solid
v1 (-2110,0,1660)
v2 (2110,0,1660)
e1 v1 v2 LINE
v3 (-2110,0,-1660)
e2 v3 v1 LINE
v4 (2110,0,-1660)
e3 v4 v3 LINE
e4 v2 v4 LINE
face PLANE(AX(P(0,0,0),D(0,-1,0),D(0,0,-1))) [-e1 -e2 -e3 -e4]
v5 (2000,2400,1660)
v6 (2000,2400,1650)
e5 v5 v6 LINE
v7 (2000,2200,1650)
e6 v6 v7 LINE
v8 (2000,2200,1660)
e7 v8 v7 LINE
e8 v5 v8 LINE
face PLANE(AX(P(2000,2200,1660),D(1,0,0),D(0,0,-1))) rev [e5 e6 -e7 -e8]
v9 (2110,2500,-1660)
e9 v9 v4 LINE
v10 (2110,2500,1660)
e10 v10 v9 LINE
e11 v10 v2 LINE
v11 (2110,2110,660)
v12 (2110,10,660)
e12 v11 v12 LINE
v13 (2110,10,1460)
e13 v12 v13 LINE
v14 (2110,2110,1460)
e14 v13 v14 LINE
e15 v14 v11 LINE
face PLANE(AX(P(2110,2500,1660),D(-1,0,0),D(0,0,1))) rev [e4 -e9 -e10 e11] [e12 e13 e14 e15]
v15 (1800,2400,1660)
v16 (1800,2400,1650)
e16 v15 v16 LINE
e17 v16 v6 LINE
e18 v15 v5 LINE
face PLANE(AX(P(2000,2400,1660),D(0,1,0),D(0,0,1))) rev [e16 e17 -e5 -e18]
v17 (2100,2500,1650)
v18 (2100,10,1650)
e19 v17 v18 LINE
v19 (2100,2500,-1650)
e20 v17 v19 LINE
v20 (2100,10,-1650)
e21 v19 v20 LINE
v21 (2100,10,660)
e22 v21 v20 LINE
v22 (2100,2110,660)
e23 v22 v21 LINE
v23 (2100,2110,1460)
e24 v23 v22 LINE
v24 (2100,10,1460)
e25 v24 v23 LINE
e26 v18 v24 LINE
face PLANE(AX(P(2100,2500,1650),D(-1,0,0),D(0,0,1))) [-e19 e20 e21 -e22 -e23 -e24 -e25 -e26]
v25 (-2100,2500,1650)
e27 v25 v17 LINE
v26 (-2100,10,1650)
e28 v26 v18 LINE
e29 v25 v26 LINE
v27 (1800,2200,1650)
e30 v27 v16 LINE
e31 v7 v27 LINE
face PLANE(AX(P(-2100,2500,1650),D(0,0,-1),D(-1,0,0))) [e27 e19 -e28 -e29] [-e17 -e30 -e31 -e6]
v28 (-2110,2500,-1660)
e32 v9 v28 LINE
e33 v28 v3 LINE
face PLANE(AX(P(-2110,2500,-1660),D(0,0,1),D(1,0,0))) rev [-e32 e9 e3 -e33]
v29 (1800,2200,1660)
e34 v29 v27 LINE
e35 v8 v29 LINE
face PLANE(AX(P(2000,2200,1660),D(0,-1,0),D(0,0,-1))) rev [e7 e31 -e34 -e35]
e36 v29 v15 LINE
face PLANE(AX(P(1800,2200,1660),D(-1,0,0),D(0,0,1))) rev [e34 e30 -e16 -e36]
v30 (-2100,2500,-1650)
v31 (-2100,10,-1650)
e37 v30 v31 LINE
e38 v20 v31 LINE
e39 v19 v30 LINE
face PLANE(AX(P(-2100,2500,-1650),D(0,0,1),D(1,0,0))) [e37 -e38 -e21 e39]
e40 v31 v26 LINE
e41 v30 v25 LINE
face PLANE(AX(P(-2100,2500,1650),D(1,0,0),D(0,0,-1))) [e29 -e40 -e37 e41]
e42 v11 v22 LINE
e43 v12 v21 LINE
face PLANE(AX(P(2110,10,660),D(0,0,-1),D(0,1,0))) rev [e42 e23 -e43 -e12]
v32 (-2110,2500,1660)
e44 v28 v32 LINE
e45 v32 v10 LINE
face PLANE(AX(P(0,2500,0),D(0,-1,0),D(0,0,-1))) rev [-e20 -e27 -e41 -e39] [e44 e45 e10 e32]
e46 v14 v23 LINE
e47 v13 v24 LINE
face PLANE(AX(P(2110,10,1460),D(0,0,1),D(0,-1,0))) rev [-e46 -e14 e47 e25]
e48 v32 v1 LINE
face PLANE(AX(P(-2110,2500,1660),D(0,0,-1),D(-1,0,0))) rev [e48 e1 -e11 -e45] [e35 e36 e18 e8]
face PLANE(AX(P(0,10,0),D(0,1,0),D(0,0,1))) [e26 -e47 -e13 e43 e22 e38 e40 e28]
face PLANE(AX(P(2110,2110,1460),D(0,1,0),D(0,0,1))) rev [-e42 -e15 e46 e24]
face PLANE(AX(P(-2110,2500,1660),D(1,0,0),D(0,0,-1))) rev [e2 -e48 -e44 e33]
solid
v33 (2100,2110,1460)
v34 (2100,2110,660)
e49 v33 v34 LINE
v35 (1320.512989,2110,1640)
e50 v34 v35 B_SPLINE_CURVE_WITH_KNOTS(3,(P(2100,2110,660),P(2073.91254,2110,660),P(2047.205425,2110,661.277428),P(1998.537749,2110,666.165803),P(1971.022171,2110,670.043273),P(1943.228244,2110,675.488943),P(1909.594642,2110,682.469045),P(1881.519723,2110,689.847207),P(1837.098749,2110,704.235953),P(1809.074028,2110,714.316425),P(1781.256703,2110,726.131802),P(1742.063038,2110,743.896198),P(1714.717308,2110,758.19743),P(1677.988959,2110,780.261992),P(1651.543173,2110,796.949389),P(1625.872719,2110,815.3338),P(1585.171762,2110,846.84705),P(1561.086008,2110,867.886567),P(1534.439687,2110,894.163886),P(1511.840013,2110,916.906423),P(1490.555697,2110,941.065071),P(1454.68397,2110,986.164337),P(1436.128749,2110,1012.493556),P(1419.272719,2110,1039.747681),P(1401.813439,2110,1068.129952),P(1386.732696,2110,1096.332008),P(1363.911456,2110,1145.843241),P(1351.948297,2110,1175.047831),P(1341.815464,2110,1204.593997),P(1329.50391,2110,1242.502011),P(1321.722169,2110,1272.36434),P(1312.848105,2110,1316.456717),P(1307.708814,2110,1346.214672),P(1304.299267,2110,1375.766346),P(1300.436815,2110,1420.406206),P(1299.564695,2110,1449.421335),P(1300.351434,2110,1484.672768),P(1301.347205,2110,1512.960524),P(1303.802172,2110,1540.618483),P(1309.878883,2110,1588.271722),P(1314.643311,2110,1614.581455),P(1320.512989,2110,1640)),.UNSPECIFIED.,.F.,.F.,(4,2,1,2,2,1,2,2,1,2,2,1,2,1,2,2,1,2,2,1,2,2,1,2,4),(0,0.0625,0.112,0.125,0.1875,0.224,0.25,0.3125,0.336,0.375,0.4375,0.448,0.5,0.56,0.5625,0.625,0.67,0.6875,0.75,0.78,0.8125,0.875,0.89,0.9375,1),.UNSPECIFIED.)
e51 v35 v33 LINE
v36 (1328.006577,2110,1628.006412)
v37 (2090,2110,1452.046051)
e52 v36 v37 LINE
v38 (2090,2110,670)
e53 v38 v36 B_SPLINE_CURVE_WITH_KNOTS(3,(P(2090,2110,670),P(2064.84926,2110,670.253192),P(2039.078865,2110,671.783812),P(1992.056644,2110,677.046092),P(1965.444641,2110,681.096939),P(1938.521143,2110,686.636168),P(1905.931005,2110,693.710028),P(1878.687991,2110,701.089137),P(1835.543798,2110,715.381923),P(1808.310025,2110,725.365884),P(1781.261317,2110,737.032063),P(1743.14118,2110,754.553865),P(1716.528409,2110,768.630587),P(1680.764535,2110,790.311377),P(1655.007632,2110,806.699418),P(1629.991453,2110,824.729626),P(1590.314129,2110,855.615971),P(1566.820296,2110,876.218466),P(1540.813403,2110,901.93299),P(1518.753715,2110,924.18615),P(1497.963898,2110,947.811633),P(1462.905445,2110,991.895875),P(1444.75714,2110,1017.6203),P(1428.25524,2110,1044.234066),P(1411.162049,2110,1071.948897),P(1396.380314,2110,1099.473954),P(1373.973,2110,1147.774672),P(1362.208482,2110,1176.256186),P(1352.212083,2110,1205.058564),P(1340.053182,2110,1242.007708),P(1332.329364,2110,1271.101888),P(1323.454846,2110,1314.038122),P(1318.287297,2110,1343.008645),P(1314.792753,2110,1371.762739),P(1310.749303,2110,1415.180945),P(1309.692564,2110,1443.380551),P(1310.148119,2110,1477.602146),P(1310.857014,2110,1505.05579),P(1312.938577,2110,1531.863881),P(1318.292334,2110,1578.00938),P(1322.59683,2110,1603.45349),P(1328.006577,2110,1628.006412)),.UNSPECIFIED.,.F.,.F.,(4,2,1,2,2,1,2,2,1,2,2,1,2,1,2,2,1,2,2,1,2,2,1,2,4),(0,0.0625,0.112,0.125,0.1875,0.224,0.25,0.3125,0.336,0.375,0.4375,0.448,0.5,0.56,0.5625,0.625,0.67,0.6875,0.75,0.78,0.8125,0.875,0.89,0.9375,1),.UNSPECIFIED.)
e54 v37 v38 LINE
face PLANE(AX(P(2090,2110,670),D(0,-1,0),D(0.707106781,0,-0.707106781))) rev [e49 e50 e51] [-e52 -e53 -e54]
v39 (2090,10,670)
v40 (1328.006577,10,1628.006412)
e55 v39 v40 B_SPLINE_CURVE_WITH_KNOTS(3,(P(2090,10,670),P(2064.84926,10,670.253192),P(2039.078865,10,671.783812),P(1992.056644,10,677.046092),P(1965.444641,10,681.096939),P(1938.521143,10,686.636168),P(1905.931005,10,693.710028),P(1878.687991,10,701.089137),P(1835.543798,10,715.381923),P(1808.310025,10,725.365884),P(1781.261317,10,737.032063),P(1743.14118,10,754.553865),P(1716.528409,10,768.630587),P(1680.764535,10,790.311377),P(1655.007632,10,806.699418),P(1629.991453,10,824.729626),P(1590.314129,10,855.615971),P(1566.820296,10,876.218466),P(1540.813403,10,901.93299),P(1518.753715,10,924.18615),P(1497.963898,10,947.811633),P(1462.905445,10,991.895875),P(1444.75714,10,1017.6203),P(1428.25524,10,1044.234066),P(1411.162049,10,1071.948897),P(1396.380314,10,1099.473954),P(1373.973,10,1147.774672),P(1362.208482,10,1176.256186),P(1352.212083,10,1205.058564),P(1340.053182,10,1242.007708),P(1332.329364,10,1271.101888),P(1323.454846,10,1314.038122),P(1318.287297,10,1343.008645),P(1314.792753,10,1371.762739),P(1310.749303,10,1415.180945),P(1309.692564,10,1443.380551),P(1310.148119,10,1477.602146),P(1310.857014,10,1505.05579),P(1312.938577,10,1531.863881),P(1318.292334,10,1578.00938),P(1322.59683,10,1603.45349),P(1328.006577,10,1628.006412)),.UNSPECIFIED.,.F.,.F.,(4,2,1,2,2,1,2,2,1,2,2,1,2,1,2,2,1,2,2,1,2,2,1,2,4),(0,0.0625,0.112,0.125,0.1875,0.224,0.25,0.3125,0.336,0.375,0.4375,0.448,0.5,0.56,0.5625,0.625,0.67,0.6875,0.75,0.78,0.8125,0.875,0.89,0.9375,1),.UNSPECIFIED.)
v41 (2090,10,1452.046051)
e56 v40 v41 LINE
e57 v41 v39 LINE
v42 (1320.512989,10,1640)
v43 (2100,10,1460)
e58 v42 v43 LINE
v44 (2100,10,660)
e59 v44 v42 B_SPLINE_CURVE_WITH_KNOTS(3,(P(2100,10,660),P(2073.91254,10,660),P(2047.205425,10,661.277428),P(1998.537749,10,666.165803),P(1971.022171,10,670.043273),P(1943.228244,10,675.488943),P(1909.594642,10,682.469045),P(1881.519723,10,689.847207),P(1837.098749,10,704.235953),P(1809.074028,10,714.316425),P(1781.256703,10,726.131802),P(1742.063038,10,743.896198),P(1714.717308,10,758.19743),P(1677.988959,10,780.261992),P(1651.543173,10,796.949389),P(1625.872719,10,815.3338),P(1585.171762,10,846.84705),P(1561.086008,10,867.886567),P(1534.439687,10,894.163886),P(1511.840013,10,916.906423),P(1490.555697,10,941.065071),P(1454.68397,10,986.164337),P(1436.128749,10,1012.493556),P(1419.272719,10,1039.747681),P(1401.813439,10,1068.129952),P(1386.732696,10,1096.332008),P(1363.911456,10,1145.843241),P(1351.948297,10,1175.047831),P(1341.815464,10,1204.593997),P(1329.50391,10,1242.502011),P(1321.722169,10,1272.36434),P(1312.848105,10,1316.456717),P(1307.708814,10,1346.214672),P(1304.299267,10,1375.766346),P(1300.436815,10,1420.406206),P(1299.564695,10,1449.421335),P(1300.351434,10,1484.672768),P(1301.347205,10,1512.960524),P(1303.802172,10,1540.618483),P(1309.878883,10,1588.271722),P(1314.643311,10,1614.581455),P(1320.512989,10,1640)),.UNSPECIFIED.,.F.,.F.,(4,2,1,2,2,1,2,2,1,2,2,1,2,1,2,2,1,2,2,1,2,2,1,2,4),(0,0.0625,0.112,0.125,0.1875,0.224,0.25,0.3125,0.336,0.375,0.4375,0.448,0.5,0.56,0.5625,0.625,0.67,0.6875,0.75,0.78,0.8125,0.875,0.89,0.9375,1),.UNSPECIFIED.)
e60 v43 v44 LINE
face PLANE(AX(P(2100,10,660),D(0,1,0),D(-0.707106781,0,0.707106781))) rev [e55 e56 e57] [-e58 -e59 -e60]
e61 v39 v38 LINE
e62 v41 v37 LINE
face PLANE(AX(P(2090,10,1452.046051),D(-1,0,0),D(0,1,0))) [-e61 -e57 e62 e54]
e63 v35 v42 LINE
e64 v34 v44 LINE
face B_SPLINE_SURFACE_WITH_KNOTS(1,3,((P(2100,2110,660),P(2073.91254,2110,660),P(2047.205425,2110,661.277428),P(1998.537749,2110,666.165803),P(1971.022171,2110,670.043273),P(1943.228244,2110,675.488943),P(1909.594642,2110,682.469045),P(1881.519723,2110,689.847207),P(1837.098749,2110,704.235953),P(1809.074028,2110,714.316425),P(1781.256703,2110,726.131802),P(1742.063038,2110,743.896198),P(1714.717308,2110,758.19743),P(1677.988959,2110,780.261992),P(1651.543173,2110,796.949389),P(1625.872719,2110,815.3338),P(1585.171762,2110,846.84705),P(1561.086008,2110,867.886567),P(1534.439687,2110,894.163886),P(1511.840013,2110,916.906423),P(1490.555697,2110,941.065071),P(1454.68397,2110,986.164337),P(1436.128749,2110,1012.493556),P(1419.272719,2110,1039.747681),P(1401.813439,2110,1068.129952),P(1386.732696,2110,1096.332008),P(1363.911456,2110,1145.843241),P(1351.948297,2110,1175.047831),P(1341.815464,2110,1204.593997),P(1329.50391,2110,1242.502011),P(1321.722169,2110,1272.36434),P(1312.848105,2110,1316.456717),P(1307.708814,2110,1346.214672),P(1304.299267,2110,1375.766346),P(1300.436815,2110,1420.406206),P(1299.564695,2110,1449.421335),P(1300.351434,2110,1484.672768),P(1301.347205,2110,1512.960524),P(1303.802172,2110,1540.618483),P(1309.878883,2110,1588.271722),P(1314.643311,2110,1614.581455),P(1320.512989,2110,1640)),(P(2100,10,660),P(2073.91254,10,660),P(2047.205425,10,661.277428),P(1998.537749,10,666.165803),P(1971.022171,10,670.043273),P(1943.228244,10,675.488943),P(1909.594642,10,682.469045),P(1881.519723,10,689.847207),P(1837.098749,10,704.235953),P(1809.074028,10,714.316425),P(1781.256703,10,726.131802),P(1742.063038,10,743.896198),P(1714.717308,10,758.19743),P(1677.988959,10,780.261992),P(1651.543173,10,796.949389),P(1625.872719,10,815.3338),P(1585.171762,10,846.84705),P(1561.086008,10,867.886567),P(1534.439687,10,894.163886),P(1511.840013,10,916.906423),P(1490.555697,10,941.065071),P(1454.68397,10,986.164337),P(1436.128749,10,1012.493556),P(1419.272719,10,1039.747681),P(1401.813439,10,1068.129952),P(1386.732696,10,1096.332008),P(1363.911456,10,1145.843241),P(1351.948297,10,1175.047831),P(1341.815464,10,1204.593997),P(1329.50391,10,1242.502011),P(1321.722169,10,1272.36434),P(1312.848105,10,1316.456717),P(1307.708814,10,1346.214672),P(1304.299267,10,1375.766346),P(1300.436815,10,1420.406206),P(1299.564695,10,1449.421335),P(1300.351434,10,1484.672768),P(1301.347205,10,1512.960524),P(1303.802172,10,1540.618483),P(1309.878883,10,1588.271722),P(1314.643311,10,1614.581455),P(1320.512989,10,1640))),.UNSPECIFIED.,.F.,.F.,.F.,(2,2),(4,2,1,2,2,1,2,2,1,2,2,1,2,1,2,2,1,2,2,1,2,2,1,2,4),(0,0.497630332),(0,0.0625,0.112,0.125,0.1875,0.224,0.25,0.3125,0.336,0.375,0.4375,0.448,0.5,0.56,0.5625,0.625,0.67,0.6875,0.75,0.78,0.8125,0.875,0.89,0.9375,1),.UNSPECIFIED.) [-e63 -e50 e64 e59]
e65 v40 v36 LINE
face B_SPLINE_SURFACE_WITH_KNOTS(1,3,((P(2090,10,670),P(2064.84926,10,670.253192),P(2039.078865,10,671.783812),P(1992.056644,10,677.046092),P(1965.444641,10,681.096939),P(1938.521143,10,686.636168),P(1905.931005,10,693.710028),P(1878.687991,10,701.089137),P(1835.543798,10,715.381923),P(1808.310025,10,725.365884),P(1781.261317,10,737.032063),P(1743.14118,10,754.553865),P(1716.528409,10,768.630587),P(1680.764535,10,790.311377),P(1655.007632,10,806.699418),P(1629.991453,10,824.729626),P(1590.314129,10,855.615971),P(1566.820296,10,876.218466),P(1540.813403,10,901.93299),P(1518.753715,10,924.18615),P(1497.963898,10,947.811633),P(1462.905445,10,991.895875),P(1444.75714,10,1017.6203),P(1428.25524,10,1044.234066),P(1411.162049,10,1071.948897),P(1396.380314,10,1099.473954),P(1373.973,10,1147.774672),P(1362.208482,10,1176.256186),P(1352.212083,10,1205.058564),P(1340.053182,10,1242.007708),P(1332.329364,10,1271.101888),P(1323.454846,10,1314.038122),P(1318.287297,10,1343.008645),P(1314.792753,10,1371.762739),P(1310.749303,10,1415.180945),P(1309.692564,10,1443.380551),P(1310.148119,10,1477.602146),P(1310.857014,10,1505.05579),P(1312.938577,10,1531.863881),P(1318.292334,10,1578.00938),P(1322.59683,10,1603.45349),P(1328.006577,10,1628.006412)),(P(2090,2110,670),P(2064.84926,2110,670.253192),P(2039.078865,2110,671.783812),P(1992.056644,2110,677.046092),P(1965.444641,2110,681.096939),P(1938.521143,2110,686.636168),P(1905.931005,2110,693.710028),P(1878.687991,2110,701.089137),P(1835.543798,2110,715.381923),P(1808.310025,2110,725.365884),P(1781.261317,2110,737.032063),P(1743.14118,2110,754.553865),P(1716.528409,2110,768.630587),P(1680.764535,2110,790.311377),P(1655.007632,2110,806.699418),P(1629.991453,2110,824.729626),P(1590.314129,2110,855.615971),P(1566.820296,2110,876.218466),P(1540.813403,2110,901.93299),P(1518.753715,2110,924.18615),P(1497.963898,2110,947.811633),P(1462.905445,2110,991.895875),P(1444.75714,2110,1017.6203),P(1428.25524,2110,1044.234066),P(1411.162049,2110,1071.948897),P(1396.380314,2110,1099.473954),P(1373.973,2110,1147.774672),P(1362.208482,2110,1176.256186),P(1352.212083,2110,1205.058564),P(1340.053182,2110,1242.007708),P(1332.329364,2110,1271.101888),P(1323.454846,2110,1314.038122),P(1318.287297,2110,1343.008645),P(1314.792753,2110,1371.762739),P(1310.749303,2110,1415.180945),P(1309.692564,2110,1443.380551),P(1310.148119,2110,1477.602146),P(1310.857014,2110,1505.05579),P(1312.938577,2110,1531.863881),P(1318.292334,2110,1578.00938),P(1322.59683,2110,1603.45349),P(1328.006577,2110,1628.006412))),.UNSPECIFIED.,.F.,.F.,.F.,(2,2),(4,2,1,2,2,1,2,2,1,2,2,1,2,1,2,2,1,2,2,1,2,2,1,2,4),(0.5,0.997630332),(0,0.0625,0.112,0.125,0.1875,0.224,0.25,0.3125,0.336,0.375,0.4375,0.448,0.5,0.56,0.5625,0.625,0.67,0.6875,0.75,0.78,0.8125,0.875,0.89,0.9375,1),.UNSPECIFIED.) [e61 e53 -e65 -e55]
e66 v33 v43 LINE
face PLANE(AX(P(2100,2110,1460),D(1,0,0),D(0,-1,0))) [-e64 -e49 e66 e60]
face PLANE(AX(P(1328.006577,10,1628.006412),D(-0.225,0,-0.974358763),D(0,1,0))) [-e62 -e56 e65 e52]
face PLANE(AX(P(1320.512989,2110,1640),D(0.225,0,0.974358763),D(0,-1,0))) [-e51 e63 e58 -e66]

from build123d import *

# Parameters (mm, degrees)
CROQUIS1_W              = 4220
CROQUIS1_H              = 3320
CROQUIS1_W_2            = 4200
CROQUIS1_H_2            = 3300
SALIENTE_EXTRUIR1_DEPTH = 2500
CROQUIS2_W              = 4220
CROQUIS2_H              = 3320
SALIENTE_EXTRUIR2_DEPTH = 10
CROQUIS4_W              = 800
CROQUIS4_H              = 2100
CORTAR_EXTRUIR1_DEPTH   = 5171.07736886
CROQUIS5_W              = 200
CROQUIS5_H              = 200
CORTAR_EXTRUIR2_DEPTH   = 4654.837126501
BARRER1_START           = 10
BARRER1_DEPTH           = 2100


# Read off the part's stored shape, not the designer's step: Barrer1
with BuildPart() as part:
    # Croquis1 → Saliente-Extruir1 (new body)
    with BuildSketch(Plane(origin=(0, 0, 0), x_dir=(1, 0, 0), z_dir=(0, 1, 0))):
        Rectangle(CROQUIS1_W, CROQUIS1_H)
        Rectangle(CROQUIS1_W_2, CROQUIS1_H_2, mode=Mode.SUBTRACT)
    extrude(amount=SALIENTE_EXTRUIR1_DEPTH)

    # Croquis2 → Saliente-Extruir2 (add)
    with BuildSketch(Plane(origin=(0, 0, 0), x_dir=(1, 0, 0), z_dir=(0, 1, 0))):
        Rectangle(CROQUIS2_W, CROQUIS2_H)
    extrude(amount=SALIENTE_EXTRUIR2_DEPTH)

    # Croquis4 → Cortar-Extruir1 (cut, through all)
    with BuildSketch(Plane.ZY.offset(-2100)):
        with Locations((1060, 1060)):
            Rectangle(CROQUIS4_W, CROQUIS4_H)
    extrude(amount=-CORTAR_EXTRUIR1_DEPTH, mode=Mode.SUBTRACT)

    # Croquis5 → Cortar-Extruir2 (cut, through all)
    with BuildSketch(Plane(origin=(0, 0, 1650), x_dir=(-1, 0, 0), z_dir=(0, 0, -1))):
        with Locations((-1900, 2300)):
            Rectangle(CROQUIS5_W, CROQUIS5_H)
    extrude(amount=-CORTAR_EXTRUIR2_DEPTH, mode=Mode.SUBTRACT)


with BuildPart() as body_2:
    # Barrer1 outline → Barrer1 (new body)
    with BuildSketch(Plane(origin=(0, 0, 0), x_dir=(1, 0, 0), z_dir=(0, 1, 0)).offset(BARRER1_START)):
        with BuildLine():
            Line((2100, -1460), (2100, -660))
            add(Edge.make_bspline(
                [(2100, -660), (2073.912540262, -660), (2047.205425142, -661.277427646), (1998.537748561, -666.165802924), (1971.022170868, -670.043272858), (1943.228244208, -675.488942545), (1909.594641716, -682.46904502), (1881.519722969, -689.847207107), (1837.098749393, -704.235952802), (1809.074027841, -714.316425373), (1781.256702654, -726.131802199), (1742.063038297, -743.896197944), (1714.717308152, -758.197430259), (1677.988959354, -780.261991885), (1651.543173099, -796.949389048), (1625.872718869, -815.333799698), (1585.17176187, -846.847049938), (1561.086008122, -867.886566729), (1534.439687048, -894.163886437), (1511.840013415, -916.906423496), (1490.555696644, -941.065070966), (1454.68396975, -986.164337367), (1436.128749015, -1012.493555913), (1419.272719168, -1039.747680905), (1401.813439136, -1068.129951729), (1386.732696165, -1096.332008248), (1363.911456334, -1145.843241347), (1351.948297409, -1175.047830985), (1341.81546422, -1204.593997119), (1329.503910263, -1242.502010967), (1321.722168511, -1272.364340048), (1312.848105033, -1316.456716804), (1307.708813562, -1346.214672379), (1304.29926654, -1375.766346194), (1300.436814682, -1420.406205825), (1299.564694512, -1449.42133541), (1300.351434012, -1484.672768197), (1301.347205401, -1512.960524023), (1303.802172385, -1540.618483017), (1309.878882682, -1588.271722102), (1314.643310763, -1614.581454987), (1320.512989204, -1640)],
                knots=[0, 0, 0, 0, 0.0625, 0.0625, 0.112, 0.125, 0.125, 0.1875, 0.1875, 0.224, 0.25, 0.25, 0.3125, 0.3125, 0.336, 0.375, 0.375, 0.4375, 0.4375, 0.448, 0.5, 0.5, 0.56, 0.5625, 0.5625, 0.625, 0.625, 0.67, 0.6875, 0.6875, 0.75, 0.75, 0.78, 0.8125, 0.8125, 0.875, 0.875, 0.89, 0.9375, 0.9375, 1, 1, 1, 1], degree=3))
            Line((1320.512989204, -1640), (2100, -1460))
        make_face()
        with BuildLine():
            add(Edge.make_bspline(
                [(2090, -670), (2064.849260042, -670.253192381), (2039.078864701, -671.783812407), (1992.056644326, -677.046092349), (1965.444640774, -681.096938582), (1938.521142618, -686.636168487), (1905.931004824, -693.710028058), (1878.687990861, -701.089136682), (1835.543798301, -715.38192305), (1808.310025372, -725.365883516), (1781.261316695, -737.032063098), (1743.141179806, -754.55386536), (1716.52840869, -768.630587485), (1680.764535289, -790.311377267), (1655.007631837, -806.699418418), (1629.991452554, -824.729625587), (1590.314129043, -855.615970934), (1566.820296032, -876.218466231), (1540.813402898, -901.932989718), (1518.75371452, -924.186150168), (1497.963897958, -947.811633291), (1462.905445265, -991.895874509), (1444.757140396, -1017.620300495), (1428.255239518, -1044.234065636), (1411.162048773, -1071.948896661), (1396.380313755, -1099.473954468), (1373.973000452, -1147.77467233), (1362.20848233, -1176.256185803), (1352.212083497, -1205.058563682), (1340.053182448, -1242.007707676), (1332.329364093, -1271.10188819), (1323.454846244, -1314.038121597), (1318.28729717, -1343.008645137), (1314.792753157, -1371.762738566), (1310.749302629, -1415.180945405), (1309.692563847, -1443.380551133), (1310.148118635, -1477.602145971), (1310.857013779, -1505.055789573), (1312.938576617, -1531.863881157), (1318.292334413, -1578.009379659), (1322.596830446, -1603.453489949), (1328.006576839, -1628.006412365)],
                knots=[0, 0, 0, 0, 0.0625, 0.0625, 0.112, 0.125, 0.125, 0.1875, 0.1875, 0.224, 0.25, 0.25, 0.3125, 0.3125, 0.336, 0.375, 0.375, 0.4375, 0.4375, 0.448, 0.5, 0.5, 0.56, 0.5625, 0.5625, 0.625, 0.625, 0.67, 0.6875, 0.6875, 0.75, 0.75, 0.78, 0.8125, 0.8125, 0.875, 0.875, 0.89, 0.9375, 0.9375, 1, 1, 1, 1], degree=3))
            Line((2090, -670), (2090, -1452.04605091))
            Line((2090, -1452.04605091), (1328.006576839, -1628.006412365))
        make_face(mode=Mode.SUBTRACT)
    extrude(amount=BARRER1_DEPTH)


solid = Compound([part.part, body_2.part])
